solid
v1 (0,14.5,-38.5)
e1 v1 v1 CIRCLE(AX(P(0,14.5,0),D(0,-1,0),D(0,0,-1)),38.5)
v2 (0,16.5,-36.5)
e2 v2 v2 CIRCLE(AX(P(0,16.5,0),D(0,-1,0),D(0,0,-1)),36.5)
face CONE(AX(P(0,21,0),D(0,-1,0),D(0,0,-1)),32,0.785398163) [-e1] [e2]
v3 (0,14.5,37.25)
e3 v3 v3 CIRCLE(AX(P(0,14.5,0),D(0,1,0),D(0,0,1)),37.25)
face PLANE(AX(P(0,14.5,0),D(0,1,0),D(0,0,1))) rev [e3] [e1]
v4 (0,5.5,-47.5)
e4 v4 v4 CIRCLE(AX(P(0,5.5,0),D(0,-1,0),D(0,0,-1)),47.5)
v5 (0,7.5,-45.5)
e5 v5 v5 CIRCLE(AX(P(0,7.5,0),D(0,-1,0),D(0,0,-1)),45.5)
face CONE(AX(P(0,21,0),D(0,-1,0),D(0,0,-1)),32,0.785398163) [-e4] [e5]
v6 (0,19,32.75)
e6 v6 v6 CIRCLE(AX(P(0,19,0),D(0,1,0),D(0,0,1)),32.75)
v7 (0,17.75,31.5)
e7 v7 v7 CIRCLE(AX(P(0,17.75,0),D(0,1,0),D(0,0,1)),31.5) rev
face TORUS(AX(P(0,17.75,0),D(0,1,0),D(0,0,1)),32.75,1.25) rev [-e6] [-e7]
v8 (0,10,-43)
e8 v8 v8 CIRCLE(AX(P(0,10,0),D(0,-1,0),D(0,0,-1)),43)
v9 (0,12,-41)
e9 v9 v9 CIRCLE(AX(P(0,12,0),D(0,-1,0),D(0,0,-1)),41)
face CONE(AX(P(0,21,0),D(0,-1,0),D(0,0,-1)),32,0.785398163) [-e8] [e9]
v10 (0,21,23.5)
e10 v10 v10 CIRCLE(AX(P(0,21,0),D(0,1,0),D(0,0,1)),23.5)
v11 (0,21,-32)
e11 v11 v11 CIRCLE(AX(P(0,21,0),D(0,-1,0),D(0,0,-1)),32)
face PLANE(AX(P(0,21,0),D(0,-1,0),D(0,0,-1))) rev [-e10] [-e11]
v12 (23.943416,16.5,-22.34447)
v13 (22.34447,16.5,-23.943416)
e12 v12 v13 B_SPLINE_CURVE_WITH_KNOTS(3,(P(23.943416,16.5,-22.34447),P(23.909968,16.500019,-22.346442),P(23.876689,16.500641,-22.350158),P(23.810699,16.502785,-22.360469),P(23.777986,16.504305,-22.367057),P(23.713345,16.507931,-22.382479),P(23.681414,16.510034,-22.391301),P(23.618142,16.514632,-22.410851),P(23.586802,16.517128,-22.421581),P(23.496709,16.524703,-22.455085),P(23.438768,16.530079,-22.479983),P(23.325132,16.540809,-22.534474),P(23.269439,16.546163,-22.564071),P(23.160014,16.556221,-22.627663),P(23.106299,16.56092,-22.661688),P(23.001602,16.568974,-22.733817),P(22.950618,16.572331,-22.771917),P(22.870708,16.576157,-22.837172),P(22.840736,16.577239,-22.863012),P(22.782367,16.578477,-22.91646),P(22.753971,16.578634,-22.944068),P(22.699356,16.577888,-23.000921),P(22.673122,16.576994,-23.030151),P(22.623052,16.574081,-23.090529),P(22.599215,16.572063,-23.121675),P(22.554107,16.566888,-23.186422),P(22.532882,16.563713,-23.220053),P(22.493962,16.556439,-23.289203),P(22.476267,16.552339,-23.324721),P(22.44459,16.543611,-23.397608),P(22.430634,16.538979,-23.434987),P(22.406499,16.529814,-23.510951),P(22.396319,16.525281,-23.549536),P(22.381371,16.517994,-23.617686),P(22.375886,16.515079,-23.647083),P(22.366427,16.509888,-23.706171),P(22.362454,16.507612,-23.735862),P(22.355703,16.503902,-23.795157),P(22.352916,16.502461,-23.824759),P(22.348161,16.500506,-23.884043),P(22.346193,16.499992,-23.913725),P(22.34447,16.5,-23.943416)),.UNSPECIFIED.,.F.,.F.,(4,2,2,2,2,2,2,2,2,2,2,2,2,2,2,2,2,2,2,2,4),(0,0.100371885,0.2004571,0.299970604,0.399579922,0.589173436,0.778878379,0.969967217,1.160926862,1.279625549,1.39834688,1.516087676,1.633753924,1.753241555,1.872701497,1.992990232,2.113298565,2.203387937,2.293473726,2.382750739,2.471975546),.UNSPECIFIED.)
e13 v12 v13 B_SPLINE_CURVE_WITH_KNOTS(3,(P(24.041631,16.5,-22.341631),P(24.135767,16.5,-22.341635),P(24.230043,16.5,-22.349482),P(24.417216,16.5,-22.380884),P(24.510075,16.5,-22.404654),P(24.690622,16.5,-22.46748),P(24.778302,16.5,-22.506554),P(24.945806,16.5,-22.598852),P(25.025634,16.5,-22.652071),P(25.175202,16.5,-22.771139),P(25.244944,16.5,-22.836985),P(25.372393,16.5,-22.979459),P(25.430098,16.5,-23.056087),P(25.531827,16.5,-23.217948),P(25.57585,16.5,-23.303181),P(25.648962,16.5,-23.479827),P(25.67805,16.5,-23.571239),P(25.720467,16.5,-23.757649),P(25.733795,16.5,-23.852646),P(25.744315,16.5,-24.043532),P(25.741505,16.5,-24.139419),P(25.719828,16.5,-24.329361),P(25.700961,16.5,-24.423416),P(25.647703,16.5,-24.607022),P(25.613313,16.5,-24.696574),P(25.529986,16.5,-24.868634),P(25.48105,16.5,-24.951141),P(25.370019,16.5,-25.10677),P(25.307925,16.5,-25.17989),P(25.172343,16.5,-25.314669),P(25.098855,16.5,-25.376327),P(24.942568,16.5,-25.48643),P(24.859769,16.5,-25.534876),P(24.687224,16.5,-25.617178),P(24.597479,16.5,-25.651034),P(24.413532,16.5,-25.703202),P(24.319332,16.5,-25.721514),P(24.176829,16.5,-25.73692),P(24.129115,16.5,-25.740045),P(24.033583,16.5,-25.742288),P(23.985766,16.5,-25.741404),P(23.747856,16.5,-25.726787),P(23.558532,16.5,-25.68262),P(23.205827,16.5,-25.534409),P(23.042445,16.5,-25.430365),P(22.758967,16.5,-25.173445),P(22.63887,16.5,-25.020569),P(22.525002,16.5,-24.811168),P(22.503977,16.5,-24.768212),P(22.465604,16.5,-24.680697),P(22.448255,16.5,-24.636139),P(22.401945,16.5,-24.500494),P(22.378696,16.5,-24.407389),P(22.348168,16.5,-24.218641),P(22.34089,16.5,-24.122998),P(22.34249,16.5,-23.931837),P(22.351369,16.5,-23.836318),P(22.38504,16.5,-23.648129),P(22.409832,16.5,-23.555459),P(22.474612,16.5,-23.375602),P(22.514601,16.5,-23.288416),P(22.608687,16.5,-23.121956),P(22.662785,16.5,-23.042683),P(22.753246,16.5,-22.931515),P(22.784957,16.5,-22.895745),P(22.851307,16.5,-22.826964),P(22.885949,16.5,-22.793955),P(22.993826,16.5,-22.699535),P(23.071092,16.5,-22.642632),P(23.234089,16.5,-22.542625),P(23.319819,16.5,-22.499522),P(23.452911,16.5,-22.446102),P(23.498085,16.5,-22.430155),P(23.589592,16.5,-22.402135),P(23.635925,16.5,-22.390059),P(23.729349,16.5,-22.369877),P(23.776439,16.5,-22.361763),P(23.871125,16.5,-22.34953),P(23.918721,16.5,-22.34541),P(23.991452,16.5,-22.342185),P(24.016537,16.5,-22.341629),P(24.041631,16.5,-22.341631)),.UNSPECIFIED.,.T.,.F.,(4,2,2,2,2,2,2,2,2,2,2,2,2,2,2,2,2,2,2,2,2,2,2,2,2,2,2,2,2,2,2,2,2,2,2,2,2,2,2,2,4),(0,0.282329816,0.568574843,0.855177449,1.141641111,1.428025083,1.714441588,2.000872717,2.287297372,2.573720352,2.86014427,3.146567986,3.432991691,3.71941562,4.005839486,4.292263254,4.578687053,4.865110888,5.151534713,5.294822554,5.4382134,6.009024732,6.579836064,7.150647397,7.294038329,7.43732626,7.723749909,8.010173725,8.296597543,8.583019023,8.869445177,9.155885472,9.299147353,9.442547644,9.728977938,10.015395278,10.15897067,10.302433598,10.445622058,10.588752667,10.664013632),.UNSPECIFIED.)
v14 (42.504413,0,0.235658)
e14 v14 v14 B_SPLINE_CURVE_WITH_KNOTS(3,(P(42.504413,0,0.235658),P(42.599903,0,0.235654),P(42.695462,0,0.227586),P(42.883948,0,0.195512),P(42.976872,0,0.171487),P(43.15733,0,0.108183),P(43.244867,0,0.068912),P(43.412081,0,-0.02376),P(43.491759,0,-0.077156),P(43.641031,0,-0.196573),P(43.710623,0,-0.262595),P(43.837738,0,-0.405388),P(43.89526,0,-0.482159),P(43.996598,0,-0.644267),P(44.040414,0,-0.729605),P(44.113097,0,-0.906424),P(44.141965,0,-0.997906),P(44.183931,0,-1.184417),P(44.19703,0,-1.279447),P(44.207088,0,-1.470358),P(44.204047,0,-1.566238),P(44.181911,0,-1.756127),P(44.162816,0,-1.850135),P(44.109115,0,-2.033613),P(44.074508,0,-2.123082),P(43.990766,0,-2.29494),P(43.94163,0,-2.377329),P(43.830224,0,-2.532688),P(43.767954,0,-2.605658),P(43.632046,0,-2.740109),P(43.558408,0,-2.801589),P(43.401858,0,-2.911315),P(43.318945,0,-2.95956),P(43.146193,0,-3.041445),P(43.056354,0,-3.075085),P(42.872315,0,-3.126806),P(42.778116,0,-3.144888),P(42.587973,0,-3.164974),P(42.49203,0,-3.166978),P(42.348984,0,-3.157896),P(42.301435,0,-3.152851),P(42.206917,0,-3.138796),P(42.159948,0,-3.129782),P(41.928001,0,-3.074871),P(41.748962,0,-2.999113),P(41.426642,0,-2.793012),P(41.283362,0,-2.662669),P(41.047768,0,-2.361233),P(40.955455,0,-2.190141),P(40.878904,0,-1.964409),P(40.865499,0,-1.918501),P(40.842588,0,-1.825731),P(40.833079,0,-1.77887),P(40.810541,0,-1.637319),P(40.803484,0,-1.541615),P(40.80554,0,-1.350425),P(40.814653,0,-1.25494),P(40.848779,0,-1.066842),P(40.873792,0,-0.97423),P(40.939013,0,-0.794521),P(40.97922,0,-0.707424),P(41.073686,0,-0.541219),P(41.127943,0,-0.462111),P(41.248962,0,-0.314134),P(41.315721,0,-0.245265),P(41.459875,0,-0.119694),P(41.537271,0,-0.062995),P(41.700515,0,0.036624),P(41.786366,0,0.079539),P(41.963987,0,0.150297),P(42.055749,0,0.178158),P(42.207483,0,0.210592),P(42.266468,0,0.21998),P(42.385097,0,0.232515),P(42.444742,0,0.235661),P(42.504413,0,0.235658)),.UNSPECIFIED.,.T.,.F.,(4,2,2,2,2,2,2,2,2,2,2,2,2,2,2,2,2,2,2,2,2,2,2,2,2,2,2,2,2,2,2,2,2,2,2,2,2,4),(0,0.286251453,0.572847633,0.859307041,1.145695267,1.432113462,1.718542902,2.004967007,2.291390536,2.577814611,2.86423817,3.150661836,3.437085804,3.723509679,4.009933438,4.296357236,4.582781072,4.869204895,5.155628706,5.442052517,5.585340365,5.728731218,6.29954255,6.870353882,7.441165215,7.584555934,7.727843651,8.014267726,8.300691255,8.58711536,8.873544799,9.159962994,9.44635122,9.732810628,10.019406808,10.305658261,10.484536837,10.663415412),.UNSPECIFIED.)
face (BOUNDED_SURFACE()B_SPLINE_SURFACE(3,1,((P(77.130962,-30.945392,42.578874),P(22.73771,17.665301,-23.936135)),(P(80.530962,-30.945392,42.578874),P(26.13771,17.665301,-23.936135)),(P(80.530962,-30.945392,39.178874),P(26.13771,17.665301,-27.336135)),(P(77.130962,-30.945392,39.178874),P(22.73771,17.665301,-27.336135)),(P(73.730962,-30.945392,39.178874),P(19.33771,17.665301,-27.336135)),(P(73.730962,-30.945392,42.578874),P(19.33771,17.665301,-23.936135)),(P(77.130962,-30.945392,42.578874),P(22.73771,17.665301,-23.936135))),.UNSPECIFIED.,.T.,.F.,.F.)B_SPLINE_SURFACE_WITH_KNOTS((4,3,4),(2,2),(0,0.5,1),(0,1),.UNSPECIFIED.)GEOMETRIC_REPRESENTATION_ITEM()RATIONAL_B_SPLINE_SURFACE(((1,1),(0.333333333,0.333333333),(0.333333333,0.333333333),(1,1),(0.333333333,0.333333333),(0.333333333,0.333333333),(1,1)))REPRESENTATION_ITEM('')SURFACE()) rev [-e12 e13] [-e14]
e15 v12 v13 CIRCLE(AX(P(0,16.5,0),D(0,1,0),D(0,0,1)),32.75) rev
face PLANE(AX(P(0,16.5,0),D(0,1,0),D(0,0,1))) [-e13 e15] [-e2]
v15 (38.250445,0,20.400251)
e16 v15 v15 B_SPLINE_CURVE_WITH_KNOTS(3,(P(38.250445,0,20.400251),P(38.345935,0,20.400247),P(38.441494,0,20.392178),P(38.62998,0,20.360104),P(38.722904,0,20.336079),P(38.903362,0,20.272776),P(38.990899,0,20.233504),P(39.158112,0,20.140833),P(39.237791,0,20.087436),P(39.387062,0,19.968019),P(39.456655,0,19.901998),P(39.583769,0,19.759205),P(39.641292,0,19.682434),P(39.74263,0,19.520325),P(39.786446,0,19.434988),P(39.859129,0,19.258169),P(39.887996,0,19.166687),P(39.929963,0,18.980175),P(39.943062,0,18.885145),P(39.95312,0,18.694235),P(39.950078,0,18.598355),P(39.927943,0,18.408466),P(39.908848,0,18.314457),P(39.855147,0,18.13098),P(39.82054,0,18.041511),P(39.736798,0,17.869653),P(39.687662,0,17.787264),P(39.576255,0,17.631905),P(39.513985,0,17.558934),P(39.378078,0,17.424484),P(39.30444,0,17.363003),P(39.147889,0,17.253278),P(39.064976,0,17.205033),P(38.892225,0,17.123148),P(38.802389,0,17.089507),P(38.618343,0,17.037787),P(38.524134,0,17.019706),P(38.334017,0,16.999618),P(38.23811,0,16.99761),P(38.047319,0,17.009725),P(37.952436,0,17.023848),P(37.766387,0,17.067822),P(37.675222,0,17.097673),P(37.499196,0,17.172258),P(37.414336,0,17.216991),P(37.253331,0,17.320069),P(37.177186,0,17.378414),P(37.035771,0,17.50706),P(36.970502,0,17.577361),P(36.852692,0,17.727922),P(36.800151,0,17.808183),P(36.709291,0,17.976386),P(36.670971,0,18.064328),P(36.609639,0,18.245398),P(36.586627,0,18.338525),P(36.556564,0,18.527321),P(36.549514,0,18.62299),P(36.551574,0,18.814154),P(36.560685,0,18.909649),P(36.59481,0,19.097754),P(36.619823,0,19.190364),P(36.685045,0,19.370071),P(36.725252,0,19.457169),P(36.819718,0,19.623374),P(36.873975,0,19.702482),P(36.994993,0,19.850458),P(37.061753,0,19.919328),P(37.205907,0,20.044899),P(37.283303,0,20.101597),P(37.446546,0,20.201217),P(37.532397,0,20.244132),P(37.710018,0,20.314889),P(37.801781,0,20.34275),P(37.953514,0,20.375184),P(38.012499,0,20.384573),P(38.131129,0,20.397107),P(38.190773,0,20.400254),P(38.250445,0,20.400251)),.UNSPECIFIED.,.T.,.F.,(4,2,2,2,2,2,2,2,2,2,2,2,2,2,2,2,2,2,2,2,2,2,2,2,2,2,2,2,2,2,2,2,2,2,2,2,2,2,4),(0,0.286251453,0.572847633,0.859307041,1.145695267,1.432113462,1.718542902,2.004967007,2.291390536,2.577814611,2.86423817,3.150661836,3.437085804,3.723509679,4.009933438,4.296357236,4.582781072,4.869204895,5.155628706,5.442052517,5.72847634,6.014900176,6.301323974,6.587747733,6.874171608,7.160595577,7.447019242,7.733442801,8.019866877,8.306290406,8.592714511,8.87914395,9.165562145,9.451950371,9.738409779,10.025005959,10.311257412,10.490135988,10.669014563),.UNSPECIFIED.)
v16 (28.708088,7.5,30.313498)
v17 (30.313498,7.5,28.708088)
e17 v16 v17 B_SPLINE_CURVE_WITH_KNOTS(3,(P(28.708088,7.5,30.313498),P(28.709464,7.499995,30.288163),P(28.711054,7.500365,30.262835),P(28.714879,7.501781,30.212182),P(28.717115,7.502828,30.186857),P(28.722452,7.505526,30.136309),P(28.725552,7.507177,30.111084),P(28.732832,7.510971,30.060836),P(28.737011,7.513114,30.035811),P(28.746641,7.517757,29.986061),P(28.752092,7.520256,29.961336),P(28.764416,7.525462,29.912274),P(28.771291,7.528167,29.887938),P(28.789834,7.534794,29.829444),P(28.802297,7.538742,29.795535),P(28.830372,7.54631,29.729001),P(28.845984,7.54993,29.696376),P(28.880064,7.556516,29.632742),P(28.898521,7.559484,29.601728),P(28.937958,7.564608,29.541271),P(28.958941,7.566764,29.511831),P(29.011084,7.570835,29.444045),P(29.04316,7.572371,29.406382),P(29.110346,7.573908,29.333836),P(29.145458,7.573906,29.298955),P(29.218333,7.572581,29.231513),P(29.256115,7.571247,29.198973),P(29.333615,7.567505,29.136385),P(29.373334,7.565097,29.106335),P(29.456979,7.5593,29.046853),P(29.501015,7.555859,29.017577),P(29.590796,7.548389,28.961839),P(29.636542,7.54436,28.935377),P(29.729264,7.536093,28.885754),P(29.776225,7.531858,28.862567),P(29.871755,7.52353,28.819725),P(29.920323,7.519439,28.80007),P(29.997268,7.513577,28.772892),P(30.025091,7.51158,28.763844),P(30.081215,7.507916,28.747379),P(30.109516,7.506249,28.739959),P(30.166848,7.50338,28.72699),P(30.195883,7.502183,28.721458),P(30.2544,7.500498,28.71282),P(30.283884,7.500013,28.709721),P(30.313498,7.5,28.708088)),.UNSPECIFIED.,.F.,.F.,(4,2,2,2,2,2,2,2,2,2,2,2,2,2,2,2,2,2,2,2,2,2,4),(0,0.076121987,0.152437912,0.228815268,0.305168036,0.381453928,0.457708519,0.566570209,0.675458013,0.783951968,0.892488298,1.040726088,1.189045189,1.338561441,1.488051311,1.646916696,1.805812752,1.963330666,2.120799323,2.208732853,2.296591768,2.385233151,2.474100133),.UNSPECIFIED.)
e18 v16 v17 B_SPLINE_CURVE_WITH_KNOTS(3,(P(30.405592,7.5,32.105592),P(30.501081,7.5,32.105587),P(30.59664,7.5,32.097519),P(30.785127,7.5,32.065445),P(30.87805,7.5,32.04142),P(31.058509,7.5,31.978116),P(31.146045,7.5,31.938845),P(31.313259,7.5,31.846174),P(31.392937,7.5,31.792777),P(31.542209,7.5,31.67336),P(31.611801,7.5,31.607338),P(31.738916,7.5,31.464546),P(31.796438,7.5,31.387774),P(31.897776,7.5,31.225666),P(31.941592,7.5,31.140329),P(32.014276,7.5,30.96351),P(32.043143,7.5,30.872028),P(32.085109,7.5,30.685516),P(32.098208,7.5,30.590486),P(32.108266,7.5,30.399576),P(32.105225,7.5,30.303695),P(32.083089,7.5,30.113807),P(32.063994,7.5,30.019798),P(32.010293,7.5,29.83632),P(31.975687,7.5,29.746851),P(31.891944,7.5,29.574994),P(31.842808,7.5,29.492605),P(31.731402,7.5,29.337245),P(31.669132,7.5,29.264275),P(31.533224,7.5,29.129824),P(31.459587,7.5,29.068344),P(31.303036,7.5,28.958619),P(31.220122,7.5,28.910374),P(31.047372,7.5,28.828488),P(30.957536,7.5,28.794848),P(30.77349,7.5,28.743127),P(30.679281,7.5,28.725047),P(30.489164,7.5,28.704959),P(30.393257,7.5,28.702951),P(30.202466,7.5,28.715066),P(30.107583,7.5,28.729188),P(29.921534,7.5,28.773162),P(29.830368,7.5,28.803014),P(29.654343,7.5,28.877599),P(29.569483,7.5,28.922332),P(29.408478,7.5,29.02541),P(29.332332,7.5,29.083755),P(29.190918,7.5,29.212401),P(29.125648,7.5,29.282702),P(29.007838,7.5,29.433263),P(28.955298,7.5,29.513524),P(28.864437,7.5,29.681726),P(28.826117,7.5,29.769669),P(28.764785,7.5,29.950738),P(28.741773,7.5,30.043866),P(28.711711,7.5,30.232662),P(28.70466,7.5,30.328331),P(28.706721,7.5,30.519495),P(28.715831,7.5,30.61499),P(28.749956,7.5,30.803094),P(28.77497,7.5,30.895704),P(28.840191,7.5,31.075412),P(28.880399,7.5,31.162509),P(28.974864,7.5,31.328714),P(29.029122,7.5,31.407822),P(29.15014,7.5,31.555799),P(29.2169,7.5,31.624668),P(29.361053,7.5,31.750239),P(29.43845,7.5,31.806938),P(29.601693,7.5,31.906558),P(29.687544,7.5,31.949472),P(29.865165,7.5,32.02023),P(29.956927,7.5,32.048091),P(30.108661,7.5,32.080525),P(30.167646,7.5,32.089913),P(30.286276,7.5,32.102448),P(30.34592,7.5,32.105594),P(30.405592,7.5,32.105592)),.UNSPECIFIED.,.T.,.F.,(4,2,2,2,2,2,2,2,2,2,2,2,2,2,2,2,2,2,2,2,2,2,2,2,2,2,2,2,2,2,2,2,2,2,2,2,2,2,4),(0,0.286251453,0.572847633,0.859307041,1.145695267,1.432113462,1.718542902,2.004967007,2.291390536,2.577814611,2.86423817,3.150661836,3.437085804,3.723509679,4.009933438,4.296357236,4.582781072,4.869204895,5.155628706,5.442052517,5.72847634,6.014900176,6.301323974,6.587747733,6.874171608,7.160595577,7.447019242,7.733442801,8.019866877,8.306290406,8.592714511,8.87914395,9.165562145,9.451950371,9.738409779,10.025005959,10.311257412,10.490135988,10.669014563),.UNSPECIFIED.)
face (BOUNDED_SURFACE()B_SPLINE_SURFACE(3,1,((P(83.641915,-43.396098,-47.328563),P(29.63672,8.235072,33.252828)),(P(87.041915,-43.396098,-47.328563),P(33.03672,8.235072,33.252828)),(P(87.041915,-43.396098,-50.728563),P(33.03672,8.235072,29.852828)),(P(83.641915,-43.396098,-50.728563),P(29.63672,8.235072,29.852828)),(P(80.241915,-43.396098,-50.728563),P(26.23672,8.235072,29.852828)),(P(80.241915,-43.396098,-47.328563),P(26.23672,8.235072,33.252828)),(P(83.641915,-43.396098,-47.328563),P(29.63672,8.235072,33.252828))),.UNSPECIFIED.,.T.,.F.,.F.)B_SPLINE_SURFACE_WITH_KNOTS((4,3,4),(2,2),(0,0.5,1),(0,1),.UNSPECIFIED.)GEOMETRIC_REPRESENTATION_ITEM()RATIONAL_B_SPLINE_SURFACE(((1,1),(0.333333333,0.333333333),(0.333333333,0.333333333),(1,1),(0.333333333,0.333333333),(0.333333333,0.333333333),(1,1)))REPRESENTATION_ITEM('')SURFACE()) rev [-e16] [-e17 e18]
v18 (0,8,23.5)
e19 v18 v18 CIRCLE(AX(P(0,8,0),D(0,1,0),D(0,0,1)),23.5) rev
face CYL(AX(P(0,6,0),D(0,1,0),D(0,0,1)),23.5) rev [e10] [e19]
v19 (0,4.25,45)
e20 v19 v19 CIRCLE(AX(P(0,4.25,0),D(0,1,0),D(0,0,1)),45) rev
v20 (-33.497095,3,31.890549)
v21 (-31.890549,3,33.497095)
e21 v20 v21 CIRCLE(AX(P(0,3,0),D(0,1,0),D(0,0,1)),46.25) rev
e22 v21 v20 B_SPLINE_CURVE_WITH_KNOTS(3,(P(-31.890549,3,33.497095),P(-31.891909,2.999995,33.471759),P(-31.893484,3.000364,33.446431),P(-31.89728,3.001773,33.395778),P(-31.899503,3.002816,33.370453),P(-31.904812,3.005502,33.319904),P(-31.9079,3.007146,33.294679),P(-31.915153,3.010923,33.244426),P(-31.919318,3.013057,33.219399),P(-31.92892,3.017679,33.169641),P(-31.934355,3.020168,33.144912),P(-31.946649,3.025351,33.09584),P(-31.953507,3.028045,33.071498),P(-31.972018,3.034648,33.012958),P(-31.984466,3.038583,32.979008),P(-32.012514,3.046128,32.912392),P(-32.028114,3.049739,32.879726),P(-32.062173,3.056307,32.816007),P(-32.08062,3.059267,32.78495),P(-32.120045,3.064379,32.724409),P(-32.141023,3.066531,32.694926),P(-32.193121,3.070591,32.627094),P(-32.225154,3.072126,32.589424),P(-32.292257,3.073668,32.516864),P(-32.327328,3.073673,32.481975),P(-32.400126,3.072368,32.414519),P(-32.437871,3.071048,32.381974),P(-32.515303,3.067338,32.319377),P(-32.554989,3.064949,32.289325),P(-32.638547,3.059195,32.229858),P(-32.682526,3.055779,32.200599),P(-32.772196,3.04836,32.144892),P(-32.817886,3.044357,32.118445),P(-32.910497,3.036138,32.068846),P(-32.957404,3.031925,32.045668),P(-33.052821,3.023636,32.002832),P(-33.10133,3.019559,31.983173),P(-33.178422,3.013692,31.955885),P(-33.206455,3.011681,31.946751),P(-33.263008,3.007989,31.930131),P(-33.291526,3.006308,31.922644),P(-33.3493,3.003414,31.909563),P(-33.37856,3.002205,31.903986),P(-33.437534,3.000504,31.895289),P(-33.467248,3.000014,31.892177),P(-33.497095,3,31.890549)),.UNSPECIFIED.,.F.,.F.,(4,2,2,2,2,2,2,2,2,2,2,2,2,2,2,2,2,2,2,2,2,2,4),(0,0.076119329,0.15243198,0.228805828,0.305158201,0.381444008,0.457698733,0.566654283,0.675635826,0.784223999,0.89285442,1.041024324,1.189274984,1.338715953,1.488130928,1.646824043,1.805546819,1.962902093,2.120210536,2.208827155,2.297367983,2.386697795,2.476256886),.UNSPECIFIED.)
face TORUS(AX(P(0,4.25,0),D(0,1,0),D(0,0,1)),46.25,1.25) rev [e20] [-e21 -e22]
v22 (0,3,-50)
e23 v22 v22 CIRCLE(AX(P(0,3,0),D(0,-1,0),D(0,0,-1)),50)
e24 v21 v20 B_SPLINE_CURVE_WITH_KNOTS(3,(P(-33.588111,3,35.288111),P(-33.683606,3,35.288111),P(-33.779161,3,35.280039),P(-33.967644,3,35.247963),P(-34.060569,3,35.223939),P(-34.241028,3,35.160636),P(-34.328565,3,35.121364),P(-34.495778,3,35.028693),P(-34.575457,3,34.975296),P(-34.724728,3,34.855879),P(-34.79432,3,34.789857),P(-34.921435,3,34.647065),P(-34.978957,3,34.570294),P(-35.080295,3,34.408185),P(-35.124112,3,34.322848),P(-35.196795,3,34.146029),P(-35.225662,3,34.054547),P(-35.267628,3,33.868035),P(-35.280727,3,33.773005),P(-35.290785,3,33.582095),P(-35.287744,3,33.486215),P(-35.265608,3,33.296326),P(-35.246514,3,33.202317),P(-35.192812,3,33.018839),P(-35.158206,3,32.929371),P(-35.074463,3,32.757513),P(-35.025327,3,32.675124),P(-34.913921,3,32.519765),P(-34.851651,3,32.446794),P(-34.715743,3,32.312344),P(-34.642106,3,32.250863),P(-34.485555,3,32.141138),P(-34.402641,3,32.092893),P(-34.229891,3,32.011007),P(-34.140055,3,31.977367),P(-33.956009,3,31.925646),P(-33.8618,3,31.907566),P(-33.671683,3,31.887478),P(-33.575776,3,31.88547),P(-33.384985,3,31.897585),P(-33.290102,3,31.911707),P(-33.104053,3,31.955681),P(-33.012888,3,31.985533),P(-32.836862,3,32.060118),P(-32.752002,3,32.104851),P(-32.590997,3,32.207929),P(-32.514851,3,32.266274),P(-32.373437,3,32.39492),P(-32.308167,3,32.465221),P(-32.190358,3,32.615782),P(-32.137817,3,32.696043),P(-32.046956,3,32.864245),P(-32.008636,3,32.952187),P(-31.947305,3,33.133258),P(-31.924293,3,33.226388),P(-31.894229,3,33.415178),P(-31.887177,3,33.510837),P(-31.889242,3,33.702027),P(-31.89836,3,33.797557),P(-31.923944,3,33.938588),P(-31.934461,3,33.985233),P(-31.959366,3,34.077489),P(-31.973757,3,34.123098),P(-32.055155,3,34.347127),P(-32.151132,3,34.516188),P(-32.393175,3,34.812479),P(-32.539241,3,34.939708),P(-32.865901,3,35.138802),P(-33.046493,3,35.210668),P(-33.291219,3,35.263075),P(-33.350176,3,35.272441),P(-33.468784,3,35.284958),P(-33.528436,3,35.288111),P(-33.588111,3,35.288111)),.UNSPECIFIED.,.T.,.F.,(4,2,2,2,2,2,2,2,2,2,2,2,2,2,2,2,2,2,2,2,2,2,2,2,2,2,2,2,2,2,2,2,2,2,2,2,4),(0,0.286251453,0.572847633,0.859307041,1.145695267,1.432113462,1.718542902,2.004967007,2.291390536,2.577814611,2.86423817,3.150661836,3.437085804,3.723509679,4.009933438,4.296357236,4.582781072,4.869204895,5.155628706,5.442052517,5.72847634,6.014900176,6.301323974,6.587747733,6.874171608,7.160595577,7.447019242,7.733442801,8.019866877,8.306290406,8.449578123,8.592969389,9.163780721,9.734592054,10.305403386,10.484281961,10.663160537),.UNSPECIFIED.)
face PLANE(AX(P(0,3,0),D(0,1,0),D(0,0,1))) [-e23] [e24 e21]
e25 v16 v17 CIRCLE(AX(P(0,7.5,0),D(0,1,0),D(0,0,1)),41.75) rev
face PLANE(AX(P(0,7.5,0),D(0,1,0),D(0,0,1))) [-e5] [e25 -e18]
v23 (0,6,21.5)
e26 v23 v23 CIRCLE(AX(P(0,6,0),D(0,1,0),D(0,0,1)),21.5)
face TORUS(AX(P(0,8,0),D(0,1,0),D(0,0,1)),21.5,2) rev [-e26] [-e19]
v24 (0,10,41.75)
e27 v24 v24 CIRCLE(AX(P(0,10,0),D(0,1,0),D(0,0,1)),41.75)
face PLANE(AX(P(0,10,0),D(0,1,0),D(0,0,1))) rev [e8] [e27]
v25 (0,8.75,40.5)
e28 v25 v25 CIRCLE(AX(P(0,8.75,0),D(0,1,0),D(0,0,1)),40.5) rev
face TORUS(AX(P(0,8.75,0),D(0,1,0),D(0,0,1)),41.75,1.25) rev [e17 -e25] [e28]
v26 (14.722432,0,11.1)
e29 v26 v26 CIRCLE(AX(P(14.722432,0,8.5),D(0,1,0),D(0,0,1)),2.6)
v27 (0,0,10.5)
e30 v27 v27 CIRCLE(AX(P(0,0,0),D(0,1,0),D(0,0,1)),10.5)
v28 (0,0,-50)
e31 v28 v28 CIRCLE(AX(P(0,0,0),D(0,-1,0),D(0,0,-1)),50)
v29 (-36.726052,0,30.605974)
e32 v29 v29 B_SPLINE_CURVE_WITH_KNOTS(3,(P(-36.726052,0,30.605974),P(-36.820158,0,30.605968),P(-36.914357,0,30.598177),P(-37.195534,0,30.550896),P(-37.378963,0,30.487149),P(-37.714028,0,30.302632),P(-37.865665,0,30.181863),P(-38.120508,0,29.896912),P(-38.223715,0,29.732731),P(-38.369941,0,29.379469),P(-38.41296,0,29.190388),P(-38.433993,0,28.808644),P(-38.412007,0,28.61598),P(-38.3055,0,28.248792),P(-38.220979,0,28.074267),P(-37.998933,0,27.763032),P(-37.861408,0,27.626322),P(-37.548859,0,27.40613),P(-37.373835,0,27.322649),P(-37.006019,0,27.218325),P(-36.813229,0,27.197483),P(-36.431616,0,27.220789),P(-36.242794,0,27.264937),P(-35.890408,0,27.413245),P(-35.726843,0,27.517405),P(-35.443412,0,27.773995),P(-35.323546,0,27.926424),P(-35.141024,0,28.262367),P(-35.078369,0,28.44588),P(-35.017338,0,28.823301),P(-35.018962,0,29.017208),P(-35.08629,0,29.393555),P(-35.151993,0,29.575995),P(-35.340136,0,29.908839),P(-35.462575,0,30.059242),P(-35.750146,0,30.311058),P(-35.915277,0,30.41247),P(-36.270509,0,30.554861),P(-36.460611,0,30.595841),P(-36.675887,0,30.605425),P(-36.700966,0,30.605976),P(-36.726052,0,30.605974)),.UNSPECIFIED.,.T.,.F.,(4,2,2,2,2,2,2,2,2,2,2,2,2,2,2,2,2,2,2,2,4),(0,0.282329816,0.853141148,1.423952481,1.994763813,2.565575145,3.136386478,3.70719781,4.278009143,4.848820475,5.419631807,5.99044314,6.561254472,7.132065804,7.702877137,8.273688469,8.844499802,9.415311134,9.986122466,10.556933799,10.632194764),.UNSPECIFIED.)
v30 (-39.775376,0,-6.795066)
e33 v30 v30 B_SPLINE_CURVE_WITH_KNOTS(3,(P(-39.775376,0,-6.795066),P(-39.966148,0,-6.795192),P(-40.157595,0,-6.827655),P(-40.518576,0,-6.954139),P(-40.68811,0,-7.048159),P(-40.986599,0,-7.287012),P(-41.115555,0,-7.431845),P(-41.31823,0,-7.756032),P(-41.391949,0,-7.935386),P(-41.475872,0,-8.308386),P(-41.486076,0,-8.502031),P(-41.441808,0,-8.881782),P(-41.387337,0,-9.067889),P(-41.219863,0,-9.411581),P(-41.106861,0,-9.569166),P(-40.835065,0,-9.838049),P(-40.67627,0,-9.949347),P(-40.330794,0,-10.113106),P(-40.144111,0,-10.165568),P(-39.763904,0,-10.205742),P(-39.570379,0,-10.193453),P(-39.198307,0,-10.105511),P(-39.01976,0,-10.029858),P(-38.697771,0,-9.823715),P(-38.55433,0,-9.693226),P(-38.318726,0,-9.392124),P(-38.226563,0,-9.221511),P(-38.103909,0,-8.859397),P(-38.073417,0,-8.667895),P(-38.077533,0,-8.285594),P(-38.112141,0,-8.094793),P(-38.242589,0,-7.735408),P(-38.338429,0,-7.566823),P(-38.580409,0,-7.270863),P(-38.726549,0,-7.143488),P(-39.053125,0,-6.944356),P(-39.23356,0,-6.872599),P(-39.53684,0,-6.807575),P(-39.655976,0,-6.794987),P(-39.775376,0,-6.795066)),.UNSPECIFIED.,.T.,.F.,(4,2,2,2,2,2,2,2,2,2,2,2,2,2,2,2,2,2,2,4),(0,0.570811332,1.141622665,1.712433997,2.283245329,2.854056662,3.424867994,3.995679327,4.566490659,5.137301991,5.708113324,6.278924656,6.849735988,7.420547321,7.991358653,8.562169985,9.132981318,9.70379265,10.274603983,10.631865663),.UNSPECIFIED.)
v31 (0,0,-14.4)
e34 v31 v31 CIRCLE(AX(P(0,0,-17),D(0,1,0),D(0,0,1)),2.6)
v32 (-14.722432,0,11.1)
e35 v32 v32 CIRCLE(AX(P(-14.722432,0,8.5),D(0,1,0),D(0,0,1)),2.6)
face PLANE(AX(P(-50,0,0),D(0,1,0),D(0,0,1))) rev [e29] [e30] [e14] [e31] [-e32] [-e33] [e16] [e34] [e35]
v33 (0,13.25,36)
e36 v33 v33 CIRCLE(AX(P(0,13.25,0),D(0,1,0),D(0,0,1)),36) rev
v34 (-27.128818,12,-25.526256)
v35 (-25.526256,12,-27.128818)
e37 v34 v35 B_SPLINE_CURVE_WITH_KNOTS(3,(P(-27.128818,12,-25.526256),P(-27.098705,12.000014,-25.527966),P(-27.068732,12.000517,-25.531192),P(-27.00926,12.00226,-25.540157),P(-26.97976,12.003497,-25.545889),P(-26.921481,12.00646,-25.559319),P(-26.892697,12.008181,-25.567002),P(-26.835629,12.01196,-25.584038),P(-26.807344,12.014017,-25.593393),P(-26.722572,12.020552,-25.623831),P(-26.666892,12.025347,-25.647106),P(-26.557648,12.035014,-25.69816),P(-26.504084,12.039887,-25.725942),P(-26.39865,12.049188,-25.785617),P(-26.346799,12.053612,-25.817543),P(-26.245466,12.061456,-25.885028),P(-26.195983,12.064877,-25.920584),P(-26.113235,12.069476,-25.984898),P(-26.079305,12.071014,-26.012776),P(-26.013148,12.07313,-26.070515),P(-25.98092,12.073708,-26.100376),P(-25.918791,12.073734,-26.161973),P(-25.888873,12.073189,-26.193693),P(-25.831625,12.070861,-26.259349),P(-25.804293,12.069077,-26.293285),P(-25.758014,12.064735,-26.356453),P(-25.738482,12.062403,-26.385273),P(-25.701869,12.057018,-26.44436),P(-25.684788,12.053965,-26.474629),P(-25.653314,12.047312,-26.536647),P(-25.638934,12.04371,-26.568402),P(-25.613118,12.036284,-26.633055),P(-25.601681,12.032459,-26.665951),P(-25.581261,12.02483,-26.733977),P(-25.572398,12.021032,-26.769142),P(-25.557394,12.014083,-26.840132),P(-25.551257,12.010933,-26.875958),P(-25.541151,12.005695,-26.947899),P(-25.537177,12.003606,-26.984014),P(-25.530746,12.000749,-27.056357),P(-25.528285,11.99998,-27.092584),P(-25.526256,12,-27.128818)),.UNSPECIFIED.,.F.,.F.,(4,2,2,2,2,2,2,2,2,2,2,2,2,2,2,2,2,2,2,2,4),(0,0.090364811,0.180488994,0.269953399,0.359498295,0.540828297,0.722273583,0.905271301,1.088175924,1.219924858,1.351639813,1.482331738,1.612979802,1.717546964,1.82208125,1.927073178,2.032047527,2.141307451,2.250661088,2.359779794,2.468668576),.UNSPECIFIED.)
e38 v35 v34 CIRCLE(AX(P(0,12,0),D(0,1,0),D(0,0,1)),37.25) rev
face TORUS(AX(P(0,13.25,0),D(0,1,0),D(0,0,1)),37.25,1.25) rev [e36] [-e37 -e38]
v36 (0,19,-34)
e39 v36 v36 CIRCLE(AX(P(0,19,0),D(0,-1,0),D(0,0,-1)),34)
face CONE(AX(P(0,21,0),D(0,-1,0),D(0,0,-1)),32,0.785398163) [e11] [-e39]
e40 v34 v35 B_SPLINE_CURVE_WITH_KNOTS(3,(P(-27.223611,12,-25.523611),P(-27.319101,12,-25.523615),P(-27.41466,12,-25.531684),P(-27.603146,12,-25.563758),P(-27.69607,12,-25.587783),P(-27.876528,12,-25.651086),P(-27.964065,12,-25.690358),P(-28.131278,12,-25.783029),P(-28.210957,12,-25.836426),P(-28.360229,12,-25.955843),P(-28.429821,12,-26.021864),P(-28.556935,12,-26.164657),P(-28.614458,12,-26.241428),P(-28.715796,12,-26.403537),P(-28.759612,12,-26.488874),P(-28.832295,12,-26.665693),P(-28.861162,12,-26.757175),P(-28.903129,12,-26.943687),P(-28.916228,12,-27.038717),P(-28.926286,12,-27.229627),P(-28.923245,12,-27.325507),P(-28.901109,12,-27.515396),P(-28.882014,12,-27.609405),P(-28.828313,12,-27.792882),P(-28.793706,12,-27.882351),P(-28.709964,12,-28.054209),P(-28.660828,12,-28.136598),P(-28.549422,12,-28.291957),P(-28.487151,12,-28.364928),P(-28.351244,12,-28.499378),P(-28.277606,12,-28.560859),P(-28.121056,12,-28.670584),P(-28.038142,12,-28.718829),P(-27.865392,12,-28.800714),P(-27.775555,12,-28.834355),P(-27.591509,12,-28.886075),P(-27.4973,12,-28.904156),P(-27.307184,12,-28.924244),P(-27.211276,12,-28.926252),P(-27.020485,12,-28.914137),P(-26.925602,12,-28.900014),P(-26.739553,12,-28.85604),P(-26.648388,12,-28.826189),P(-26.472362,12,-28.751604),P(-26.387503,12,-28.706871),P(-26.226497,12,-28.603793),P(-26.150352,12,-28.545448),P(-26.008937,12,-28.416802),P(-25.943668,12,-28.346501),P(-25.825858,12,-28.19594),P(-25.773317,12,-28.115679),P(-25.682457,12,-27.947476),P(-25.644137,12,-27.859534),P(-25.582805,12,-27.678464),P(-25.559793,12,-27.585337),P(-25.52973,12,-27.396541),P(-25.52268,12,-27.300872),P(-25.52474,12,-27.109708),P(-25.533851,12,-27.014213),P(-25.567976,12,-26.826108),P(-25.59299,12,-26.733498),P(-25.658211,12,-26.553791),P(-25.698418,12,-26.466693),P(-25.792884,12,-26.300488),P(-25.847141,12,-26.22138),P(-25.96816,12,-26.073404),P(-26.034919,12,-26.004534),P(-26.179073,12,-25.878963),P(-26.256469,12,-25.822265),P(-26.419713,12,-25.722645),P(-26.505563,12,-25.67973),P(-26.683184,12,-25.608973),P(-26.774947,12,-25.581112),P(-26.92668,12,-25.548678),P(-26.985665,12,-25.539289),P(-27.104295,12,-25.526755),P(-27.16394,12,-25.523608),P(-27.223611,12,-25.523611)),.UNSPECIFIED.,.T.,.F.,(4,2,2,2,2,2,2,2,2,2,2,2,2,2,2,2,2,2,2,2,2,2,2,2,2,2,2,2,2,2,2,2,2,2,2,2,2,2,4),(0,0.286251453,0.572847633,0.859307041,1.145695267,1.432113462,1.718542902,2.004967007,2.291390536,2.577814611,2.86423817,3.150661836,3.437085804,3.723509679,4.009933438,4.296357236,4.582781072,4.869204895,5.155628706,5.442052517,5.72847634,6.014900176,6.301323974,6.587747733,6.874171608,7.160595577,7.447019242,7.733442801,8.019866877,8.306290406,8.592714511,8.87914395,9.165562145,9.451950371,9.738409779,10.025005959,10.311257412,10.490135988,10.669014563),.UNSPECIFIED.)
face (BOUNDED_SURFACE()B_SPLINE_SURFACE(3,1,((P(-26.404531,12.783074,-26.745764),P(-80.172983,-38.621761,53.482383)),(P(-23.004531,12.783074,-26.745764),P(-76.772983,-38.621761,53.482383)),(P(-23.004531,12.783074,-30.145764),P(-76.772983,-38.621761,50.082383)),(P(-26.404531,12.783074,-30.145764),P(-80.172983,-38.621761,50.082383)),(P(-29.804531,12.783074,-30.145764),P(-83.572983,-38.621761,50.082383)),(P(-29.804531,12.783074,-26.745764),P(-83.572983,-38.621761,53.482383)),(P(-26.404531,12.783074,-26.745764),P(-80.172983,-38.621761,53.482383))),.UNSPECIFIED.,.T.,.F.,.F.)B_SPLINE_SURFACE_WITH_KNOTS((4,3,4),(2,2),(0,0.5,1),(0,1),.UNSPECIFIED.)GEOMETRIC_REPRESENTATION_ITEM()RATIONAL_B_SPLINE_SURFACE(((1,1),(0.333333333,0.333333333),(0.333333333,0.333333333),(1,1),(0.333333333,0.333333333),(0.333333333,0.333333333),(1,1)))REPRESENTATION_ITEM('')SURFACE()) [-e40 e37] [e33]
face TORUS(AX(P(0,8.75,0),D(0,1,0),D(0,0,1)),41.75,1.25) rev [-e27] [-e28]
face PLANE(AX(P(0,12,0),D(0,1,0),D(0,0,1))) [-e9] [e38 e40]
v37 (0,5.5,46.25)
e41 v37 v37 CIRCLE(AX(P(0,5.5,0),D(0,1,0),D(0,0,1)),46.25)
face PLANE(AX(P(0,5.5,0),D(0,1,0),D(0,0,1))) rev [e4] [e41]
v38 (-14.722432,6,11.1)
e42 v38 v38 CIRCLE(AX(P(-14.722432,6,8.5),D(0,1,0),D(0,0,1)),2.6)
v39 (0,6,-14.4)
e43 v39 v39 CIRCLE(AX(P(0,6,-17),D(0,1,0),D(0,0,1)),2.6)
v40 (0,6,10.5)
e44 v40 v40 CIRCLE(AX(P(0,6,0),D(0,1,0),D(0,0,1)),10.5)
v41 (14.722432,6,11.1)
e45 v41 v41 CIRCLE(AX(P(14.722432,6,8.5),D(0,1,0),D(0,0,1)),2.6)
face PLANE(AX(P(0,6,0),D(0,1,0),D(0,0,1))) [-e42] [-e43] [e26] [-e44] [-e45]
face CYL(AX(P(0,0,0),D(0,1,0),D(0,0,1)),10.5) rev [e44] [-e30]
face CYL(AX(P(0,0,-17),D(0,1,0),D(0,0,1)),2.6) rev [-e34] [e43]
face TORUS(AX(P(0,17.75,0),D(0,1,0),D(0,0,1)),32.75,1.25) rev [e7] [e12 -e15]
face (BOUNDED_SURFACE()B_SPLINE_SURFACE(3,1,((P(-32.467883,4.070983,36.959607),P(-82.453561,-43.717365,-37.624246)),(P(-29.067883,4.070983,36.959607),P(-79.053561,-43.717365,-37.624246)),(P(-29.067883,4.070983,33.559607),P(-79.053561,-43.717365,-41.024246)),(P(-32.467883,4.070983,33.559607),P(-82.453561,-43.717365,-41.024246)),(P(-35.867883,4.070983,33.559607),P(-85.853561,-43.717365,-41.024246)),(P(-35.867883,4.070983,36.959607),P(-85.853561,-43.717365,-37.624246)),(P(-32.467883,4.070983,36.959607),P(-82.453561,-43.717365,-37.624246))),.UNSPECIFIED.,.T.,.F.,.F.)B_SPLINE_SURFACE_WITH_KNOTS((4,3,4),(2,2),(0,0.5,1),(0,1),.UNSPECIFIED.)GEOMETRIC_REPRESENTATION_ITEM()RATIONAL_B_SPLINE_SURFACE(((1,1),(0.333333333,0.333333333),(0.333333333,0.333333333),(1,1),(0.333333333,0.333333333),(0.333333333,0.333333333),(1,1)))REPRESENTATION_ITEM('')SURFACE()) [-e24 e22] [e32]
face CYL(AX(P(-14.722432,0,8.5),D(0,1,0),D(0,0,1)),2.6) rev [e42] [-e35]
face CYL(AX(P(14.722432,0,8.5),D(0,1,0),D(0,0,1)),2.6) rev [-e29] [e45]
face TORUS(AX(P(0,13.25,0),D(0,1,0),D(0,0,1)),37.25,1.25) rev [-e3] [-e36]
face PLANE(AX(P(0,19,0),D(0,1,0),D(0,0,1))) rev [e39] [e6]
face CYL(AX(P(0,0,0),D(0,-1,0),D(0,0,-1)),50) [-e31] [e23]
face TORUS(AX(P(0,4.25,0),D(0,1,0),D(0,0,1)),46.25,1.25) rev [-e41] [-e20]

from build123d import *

# Parameters (mm, degrees)
FILLET1_R          = 1.25
SKETCH13_R         = 23.5
CUT_EXTRUDE2_DEPTH = 15
SKETCH14_R         = 2.6
SKETCH14_R_2       = 10.5
CUT_EXTRUDE3_DEPTH = 73.284161474
FILLET2_R          = 2
SKETCH8_R          = 1.7
SKETCH11_R         = 1.7
SKETCH10_R         = 1.7
SKETCH9_R          = 1.7


with BuildPart() as part:
    # Sketch1 → Revolve1 (revolve)
    with BuildSketch(Plane.XY, mode=Mode.PRIVATE) as revolve1_sk:
        Polygon((0, 0), (0, 21), (-32, 21), (-50, 3), (-50, 0), align=None)
    revolve(revolve1_sk.sketch.rotate(Axis((0, 0, 0), (0, 1, 0)), 270), axis=Axis((0, 0, 0), (0, 1, 0)))

    # Sketch2 → Cut-Revolve1 (revolve, cut)
    with BuildSketch(Plane.XY, mode=Mode.PRIVATE) as cut_revolve1_sk:
        Polygon((-45, 5.5), (-47.5, 5.5), (-50, 3), (-45, 3), align=None)
        Polygon((-31.5, 19), (-34, 19), (-36.5, 16.5), (-31.5, 16.5), align=None)
        Polygon((-40.5, 10), (-43, 10), (-45.5, 7.5), (-40.5, 7.5), align=None)
        Polygon((-36, 14.5), (-38.5, 14.5), (-41, 12), (-36, 12), align=None)
    revolve(cut_revolve1_sk.sketch.rotate(Axis((0, 0, 0), (0, 1, 0)), 270), axis=Axis((0, 0, 0), (0, 1, 0)), mode=Mode.SUBTRACT)

    # Fillet1
    fillet1_edges = [part.edges().sort_by_distance(p)[0] for p in [
        (0, 5.5, 45),
        (0, 3, 45),
        (0, 12, 36),
        (0, 14.5, 36),
        (0, 7.5, 40.5),
        (0, 10, 40.5),
        (0, 19, 31.5),
        (0, 16.5, 31.5),
    ]]
    fillet(fillet1_edges, radius=FILLET1_R - 0.0001)  # a hair under: the kernel refuses the full size

    # Sketch13 → Cut-Extrude2 (cut)
    with BuildSketch(Plane(origin=(0, 21, 0), x_dir=(1, 0, 0), z_dir=(0, 1, 0))):
        with Locations(Location((0, 0, 0), (0, 0, 270))):
            Circle(SKETCH13_R)
    extrude(amount=-CUT_EXTRUDE2_DEPTH, mode=Mode.SUBTRACT)

    # Sketch14 → Cut-Extrude3 (cut, through all)
    with BuildSketch(Plane(origin=(0, 6, 0), x_dir=(1, 0, 0), z_dir=(0, 1, 0))):
        with Locations(Location((0, 17, 0), (0, 0, 270))):
            Circle(SKETCH14_R)
        with Locations(Location((-14.722431864, -8.5, 0), (0, 0, 270))):
            Circle(SKETCH14_R)
        with Locations(Location((0, 0, 0), (0, 0, 270))):
            Circle(SKETCH14_R_2)
        with Locations(Location((14.722431864, -8.5, 0), (0, 0, 270))):
            Circle(SKETCH14_R)
    extrude(amount=-CUT_EXTRUDE3_DEPTH, mode=Mode.SUBTRACT)

    # Fillet2
    fillet2_edges = [part.edges().sort_by_distance(p)[0] for p in [
        (0, 6, -23.5),
    ]]
    fillet(fillet2_edges, radius=FILLET2_R)

    # Cut-Sweep6: sweep along a path in Sketch15
    with BuildLine(Plane(origin=(21.321467403, -5.316806558, -21.321467403), x_dir=(-0.12278780396897587, -0.9848077530122072, 0.12278780396897629), z_dir=(-0.6963642403200171, 0.17364817766693497, 0.6963642403200199))) as cut_sweep6_path:
        Line((26.023947683, 83.445555011), (-22.153365965, 0))
        Line((-22.153365965, 0), (-23.336643221, -2.049496326))
    # Sketch8 → Cut-Sweep6 (sweep, cut)
    with BuildSketch(Plane(origin=(0, 16.5, 0), x_dir=(1, 0, 0), z_dir=(0, 1, 0))):
        with Locations((24.04163056, 24.04163056)):
            Circle(SKETCH8_R)
    sweep(path=cut_sweep6_path.line, mode=Mode.SUBTRACT)

    # Cut-Sweep7: sweep along a path in Sketch16
    with BuildLine(Plane(origin=(-21.311936665, -10.969928145, -21.311936665), x_dir=(0.24184476264797308, -0.9396926207859093, 0.24184476264797392), z_dir=(-0.6644630243886742, -0.34202014332566627, -0.6644630243886765))) as cut_sweep7_path:
        Line((29.426465731, 93.306534305), (-24.444086967, 0))
        Line((-24.444086967, 0), (-25.277416507, -1.443369103))
    # Sketch11 → Cut-Sweep7 (sweep, cut)
    with BuildSketch(Plane(origin=(0, 12, 0), x_dir=(1, 0, 0), z_dir=(0, 1, 0))):
        with Locations((-27.223611076, 27.223611076)):
            Circle(SKETCH11_R)
    sweep(path=cut_sweep7_path.line, mode=Mode.SUBTRACT)

    # Cut-Sweep8: sweep along a path in Sketch17
    with BuildLine(Plane(origin=(-28.977268915, -14.915517198, 28.977268915), x_dir=(0.2418447626479711, -0.9396926207859105, -0.2418447626479711), z_dir=(-0.664463024388675, -0.3420201433256629, 0.6644630243886775))) as cut_sweep8_path:
        Line((30.650286591, -86.109913563), (-19.065295184, 0))
        Line((-19.065295184, 0), (-20.205011582, 1.974046707))
    # Sketch10 → Cut-Sweep8 (sweep, cut)
    with BuildSketch(Plane(origin=(0, 3, 0), x_dir=(1, 0, 0), z_dir=(0, 1, 0))):
        with Locations((-33.588110704, -33.588110704)):
            Circle(SKETCH10_R)
    sweep(path=cut_sweep8_path.line, mode=Mode.SUBTRACT)

    # Cut-Sweep9: sweep along a path in Sketch18
    with BuildLine(Plane(origin=(25.144364993, -12.94260027, 25.144364993), x_dir=(-0.24184476264797813, -0.9396926207859068, -0.241844762647979), z_dir=(-0.6644630243886723, 0.34202014332567343, -0.6644630243886749))) as cut_sweep9_path:
        Line((32.407935036, -93.812194686), (-21.754560819, 0))
        Line((-21.754560819, 0), (-22.536808538, 1.354892793))
    # Sketch9 → Cut-Sweep9 (sweep, cut)
    with BuildSketch(Plane(origin=(0, 7.5, 0), x_dir=(1, 0, 0), z_dir=(0, 1, 0))):
        with Locations((30.405591591, -30.405591591)):
            Circle(SKETCH9_R)
    sweep(path=cut_sweep9_path.line, mode=Mode.SUBTRACT)


solid = part.part
